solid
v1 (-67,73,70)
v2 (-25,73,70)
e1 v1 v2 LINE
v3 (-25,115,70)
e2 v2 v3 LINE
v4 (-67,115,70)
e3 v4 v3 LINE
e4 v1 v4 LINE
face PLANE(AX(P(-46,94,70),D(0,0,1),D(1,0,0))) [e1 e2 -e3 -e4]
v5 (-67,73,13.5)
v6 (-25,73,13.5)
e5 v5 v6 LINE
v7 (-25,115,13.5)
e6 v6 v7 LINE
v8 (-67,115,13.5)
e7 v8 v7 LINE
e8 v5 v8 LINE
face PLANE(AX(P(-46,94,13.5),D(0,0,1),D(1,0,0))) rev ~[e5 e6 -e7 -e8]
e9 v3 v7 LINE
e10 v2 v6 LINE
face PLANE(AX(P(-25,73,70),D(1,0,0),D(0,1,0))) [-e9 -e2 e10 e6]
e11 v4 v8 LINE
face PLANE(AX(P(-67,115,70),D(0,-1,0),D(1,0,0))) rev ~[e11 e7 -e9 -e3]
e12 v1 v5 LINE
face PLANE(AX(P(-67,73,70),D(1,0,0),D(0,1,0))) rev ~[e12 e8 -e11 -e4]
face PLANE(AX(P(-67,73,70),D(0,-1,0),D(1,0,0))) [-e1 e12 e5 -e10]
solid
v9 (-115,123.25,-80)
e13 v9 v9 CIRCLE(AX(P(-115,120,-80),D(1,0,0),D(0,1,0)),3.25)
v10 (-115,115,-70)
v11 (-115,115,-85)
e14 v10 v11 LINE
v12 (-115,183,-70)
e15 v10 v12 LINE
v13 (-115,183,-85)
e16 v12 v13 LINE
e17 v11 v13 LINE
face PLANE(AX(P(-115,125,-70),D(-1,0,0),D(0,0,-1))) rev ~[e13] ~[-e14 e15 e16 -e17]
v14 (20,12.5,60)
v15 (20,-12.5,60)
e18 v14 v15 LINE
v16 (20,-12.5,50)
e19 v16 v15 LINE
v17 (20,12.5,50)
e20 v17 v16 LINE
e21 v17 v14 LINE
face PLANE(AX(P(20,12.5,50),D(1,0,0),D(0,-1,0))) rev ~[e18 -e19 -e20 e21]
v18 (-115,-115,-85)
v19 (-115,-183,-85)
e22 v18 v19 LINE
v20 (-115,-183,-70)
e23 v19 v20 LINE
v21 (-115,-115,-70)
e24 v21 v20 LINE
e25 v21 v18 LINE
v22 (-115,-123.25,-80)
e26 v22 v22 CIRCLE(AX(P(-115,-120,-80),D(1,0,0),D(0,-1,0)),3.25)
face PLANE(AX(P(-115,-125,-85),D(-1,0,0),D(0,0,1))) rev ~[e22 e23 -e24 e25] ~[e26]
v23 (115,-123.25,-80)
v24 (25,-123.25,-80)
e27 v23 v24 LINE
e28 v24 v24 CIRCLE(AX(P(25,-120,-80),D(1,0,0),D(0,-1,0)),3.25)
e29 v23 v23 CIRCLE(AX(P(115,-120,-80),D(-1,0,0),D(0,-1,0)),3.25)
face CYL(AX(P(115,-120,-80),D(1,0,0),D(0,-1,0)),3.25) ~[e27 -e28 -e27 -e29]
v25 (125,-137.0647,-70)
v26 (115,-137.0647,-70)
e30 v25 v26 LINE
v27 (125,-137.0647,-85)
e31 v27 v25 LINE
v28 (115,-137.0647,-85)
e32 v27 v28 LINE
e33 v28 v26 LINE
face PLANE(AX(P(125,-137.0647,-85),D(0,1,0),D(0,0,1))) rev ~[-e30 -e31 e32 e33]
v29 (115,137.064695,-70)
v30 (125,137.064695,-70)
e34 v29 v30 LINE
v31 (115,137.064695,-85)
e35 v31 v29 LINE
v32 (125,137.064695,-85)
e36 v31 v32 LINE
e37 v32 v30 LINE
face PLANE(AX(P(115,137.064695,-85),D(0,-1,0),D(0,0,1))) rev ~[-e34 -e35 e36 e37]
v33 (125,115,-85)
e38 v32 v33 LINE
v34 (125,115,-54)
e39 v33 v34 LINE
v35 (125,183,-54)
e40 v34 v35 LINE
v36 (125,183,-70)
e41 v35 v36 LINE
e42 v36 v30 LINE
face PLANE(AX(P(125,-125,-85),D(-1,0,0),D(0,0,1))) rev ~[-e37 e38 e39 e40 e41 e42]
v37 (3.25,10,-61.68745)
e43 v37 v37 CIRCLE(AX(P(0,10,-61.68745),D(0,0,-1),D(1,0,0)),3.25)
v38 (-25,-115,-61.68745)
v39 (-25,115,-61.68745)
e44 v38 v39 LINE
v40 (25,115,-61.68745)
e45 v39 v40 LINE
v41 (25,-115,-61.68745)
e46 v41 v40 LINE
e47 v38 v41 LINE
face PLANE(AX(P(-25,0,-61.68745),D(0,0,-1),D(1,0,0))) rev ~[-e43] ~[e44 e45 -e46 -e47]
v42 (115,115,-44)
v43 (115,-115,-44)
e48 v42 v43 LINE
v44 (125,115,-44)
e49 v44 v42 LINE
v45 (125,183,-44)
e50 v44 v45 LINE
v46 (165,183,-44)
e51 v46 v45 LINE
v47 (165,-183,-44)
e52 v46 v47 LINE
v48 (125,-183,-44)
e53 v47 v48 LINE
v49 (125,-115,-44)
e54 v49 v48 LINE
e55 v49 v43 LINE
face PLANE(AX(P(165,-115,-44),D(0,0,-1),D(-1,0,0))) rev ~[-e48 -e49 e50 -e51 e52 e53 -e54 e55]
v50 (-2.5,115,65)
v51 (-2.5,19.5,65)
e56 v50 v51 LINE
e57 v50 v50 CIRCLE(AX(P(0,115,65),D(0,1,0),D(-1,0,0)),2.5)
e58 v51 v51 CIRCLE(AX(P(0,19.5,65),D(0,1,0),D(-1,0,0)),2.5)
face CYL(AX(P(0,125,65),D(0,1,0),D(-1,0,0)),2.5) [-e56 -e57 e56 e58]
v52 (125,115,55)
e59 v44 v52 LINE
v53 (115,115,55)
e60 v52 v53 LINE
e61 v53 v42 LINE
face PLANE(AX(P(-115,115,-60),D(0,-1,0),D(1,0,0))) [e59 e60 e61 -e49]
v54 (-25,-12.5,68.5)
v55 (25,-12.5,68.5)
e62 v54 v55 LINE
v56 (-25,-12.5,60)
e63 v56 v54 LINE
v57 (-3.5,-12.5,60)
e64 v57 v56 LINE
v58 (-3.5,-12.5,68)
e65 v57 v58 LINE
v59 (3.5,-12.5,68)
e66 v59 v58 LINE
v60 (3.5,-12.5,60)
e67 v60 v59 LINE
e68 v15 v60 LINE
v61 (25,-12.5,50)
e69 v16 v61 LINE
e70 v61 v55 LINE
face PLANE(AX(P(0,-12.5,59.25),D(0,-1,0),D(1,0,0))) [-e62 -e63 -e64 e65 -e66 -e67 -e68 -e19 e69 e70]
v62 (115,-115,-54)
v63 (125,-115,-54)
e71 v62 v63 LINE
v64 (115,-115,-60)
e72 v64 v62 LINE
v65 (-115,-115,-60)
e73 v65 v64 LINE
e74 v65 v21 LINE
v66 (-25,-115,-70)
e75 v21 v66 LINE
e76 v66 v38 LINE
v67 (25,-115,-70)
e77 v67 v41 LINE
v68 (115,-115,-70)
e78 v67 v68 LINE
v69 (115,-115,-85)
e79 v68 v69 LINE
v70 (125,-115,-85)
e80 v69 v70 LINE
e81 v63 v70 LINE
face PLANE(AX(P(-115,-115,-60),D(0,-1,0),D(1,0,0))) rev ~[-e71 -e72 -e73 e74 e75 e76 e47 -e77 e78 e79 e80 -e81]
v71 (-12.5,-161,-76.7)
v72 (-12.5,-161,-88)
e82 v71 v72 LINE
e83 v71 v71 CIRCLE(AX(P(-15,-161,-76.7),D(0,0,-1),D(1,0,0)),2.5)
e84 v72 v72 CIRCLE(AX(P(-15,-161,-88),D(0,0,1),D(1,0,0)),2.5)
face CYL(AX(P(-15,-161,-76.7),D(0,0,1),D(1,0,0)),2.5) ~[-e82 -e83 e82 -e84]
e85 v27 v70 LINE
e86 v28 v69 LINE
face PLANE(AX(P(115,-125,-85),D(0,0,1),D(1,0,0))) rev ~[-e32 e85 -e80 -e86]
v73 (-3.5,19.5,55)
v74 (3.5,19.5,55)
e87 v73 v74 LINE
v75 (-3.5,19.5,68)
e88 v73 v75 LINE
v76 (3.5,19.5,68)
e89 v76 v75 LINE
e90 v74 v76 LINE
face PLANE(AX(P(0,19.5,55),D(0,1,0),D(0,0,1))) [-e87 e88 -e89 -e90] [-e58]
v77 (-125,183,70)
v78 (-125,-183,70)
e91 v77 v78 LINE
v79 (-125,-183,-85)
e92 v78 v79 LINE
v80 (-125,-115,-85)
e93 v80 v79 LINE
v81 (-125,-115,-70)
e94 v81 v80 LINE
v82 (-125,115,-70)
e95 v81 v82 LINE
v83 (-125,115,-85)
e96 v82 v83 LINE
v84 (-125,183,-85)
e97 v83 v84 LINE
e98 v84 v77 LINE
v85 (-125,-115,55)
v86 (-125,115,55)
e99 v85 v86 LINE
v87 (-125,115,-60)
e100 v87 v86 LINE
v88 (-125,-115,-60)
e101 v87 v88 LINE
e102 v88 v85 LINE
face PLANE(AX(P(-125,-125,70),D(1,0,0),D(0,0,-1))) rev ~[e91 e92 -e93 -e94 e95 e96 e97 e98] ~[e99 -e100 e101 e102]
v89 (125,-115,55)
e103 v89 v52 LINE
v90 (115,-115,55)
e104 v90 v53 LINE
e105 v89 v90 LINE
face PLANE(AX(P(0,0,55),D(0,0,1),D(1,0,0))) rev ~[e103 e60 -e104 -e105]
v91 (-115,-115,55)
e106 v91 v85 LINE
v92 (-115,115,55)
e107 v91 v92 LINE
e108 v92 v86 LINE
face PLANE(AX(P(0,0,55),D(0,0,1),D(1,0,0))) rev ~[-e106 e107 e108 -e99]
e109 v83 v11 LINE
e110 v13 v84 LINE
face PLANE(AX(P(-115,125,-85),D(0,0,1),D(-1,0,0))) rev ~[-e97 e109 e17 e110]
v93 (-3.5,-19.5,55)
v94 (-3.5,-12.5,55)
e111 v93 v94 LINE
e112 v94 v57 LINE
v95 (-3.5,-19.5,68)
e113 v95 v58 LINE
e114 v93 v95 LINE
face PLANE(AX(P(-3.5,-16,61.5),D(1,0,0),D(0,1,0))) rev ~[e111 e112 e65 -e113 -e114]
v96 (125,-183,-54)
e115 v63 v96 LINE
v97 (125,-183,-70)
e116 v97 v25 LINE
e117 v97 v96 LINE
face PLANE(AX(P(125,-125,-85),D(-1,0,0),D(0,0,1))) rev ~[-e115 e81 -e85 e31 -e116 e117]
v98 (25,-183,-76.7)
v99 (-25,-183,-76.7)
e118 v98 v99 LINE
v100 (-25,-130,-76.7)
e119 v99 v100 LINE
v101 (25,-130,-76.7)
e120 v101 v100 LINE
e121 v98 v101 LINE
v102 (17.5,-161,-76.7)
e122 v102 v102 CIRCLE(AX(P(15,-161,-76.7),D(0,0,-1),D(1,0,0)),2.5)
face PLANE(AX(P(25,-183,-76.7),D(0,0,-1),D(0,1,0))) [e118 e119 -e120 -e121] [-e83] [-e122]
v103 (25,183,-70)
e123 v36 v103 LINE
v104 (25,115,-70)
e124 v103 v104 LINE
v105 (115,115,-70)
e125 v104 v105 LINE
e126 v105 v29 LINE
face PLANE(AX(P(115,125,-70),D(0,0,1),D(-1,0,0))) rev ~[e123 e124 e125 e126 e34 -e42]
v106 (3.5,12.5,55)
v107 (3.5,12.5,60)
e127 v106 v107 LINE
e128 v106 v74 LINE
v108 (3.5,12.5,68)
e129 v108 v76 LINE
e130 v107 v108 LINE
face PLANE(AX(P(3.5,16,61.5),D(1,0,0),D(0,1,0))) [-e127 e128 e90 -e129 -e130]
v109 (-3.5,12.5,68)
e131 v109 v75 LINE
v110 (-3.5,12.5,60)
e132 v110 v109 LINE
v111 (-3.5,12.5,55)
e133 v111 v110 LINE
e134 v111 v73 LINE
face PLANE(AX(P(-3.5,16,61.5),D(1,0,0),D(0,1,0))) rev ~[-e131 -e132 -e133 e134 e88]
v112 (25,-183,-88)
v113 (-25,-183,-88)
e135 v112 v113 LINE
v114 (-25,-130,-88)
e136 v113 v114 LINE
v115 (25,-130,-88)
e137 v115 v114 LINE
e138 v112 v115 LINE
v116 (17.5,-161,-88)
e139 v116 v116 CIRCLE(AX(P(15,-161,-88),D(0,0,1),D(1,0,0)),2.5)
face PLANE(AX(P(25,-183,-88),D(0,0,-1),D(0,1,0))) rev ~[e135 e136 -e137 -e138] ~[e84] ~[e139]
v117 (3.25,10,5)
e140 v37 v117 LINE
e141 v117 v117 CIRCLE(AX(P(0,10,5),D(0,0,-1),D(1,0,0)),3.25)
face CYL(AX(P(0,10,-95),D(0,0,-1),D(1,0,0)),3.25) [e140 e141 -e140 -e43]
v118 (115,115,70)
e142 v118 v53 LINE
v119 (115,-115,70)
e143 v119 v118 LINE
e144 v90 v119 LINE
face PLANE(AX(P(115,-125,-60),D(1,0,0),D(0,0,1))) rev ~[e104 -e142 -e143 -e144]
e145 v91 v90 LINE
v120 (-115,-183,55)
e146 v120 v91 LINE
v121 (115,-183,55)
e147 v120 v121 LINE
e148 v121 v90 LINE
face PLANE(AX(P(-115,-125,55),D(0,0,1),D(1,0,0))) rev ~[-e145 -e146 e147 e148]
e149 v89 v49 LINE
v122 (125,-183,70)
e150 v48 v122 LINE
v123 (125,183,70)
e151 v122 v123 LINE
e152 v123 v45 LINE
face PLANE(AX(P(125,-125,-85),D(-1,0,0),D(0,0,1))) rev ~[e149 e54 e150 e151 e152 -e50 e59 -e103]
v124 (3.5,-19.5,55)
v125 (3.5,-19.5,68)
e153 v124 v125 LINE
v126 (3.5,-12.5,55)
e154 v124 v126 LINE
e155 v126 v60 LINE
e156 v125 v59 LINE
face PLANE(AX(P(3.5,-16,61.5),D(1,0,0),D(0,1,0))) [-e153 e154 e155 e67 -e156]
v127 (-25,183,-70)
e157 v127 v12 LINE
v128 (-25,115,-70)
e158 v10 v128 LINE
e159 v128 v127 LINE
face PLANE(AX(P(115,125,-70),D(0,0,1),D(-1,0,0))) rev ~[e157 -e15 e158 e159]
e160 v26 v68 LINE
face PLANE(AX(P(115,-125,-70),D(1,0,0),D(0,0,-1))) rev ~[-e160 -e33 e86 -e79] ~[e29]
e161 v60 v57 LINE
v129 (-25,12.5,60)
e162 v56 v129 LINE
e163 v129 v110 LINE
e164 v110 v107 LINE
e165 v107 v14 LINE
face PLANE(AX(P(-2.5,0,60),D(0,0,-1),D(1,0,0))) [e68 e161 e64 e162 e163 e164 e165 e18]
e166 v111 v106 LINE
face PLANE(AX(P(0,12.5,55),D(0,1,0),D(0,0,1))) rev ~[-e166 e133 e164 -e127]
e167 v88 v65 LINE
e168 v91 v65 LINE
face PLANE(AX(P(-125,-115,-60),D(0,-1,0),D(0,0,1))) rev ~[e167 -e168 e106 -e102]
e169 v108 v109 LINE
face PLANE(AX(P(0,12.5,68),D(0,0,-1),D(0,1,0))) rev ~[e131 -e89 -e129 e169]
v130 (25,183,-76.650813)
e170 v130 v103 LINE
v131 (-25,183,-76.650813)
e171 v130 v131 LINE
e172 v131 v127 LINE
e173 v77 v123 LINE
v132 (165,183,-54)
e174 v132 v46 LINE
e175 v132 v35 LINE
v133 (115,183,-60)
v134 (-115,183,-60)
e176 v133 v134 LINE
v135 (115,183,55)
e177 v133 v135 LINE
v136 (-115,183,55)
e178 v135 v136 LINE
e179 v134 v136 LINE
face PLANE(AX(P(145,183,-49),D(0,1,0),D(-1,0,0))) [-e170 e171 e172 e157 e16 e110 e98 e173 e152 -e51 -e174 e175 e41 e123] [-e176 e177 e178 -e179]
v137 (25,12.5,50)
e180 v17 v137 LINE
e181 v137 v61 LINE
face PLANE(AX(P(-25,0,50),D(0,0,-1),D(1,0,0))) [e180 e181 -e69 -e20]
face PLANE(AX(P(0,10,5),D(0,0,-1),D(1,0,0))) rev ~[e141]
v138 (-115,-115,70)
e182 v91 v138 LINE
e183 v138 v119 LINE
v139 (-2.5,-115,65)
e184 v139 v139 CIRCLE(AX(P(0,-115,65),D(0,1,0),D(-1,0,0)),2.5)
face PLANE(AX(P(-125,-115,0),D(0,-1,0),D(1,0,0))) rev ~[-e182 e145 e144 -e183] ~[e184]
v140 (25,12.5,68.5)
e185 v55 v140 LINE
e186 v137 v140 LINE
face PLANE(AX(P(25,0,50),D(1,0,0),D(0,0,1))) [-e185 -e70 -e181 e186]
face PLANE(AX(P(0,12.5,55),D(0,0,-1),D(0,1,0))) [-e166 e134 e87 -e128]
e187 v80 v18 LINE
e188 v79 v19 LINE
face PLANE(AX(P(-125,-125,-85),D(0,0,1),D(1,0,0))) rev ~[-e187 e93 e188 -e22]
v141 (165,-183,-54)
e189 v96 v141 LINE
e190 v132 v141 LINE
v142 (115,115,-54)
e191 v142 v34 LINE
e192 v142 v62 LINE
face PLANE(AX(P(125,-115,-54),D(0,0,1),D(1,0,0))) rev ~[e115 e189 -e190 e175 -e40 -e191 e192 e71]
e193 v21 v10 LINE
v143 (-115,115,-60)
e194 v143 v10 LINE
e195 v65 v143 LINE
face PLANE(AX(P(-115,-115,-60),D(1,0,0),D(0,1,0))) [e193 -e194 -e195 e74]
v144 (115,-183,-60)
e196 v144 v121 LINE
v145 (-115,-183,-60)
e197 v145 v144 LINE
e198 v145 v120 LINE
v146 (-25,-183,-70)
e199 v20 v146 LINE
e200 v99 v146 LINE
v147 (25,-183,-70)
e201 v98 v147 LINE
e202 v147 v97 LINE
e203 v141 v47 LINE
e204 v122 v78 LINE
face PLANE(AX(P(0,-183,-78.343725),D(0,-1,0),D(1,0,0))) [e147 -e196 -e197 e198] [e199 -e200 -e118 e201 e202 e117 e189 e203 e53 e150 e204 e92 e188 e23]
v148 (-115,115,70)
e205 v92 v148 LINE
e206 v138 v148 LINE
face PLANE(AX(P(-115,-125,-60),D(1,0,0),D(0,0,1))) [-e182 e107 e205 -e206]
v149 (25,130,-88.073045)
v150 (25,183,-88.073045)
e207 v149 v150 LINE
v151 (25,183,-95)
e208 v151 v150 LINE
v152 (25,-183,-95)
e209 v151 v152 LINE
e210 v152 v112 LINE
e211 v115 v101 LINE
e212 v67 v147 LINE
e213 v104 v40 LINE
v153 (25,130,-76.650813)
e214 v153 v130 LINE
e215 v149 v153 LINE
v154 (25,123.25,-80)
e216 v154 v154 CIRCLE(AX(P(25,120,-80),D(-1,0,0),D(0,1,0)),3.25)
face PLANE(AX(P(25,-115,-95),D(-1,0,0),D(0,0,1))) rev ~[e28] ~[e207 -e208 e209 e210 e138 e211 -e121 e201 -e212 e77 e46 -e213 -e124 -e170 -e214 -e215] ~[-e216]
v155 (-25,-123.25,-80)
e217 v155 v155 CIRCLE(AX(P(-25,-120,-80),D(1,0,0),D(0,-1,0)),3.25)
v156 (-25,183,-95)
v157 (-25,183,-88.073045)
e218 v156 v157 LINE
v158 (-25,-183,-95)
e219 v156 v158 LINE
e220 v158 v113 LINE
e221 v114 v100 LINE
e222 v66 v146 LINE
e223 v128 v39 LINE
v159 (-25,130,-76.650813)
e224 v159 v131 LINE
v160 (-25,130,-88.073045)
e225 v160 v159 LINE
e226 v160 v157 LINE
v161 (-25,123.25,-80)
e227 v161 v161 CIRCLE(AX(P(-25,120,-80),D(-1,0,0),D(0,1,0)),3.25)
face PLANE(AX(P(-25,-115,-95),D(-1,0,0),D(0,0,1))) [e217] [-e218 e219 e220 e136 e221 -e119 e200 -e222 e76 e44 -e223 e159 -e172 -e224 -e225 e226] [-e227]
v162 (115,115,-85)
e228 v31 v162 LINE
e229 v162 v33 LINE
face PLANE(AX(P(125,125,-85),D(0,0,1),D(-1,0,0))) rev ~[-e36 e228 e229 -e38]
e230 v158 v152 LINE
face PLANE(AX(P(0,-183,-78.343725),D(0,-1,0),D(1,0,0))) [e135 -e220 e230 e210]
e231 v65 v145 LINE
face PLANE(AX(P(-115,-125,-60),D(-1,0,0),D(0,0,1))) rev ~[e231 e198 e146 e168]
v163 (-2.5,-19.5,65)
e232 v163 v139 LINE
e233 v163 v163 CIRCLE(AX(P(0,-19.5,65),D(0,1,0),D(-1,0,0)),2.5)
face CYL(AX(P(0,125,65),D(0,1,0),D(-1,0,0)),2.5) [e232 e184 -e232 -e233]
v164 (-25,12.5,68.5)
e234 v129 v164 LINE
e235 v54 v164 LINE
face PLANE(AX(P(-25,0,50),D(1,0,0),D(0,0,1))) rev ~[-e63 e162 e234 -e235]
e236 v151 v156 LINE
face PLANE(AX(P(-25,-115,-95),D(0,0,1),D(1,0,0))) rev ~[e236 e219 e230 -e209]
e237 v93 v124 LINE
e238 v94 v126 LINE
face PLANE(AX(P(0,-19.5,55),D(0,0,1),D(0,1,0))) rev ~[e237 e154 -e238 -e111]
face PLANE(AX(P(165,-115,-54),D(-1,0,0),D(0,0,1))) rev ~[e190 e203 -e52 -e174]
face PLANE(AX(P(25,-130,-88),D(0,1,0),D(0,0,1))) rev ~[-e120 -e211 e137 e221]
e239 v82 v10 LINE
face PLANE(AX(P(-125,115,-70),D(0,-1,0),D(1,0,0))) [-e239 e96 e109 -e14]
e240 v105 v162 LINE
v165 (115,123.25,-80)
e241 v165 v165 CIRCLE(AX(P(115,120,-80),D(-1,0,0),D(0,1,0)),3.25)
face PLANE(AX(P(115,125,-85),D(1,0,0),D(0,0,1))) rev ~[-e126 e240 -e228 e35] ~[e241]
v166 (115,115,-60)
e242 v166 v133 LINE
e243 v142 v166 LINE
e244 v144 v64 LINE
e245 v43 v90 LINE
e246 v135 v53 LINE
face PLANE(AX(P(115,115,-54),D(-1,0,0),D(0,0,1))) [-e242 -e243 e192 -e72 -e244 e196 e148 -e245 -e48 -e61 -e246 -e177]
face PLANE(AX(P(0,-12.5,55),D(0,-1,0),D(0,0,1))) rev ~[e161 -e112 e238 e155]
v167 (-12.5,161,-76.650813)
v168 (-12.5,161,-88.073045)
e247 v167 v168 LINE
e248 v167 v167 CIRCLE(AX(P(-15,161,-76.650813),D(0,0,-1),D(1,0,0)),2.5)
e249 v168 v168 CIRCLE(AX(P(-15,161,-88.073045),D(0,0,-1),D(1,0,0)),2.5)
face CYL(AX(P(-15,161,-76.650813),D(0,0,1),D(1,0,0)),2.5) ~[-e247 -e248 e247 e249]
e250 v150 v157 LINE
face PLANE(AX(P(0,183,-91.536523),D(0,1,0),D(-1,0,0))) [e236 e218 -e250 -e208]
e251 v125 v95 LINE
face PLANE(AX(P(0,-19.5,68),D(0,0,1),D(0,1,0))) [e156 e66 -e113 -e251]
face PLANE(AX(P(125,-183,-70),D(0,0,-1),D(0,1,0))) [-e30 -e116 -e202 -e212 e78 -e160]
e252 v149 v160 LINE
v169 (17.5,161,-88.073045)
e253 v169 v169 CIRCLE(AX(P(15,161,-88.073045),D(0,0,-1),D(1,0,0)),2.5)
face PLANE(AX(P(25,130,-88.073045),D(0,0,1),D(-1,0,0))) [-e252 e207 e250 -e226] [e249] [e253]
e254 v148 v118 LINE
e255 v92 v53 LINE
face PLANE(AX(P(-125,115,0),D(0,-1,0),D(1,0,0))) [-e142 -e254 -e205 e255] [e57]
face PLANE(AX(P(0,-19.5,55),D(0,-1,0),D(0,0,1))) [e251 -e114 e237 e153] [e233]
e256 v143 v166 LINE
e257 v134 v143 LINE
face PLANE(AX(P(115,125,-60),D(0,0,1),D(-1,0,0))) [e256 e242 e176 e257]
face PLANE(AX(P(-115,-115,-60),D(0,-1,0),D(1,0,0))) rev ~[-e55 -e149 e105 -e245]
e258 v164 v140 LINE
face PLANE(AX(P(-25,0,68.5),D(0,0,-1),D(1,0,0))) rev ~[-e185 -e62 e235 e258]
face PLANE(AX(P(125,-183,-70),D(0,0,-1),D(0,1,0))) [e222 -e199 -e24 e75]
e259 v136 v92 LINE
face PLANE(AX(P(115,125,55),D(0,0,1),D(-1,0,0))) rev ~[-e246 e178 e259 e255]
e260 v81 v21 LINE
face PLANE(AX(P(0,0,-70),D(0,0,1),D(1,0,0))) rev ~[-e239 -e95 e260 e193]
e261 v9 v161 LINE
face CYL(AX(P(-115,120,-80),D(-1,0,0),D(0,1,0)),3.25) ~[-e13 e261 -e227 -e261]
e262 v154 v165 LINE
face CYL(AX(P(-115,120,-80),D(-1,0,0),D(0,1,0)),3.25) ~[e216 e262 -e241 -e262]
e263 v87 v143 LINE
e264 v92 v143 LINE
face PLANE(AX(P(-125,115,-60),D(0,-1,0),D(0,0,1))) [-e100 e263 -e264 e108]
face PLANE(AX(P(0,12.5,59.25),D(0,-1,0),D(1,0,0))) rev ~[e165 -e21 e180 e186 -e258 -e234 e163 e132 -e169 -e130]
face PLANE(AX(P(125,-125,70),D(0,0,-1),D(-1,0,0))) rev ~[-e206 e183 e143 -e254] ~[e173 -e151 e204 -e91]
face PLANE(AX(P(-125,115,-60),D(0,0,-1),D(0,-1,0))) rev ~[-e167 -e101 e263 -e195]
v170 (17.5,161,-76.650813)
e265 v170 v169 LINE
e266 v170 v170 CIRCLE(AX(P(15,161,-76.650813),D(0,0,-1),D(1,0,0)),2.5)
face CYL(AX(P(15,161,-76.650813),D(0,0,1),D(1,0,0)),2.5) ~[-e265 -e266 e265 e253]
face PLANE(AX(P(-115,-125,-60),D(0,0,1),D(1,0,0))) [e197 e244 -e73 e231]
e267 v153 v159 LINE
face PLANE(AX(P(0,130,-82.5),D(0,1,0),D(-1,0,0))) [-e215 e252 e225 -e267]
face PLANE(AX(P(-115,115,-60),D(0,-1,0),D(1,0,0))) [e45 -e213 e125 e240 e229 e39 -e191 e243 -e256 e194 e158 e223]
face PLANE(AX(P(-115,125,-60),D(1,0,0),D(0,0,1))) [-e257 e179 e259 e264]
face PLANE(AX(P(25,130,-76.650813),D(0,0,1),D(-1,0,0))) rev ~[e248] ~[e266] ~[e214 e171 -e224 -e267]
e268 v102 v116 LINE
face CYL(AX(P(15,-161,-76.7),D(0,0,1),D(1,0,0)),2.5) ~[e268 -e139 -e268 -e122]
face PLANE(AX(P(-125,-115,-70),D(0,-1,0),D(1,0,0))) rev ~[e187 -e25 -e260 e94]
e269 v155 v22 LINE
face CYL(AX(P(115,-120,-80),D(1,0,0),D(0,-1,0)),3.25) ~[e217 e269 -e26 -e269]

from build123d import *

# Parameters (mm, degrees)
F0_W         = 250
F0_H         = 250
F1_DEPTH     = 70
F2_T         = -10
F3_W         = 230
F3_H         = 120
F4_DEPTH     = 300
F5_W         = 230
F5_H         = 120
F6_DEPTH     = 300
F7_W         = 230
F7_H         = 230
F8_DEPTH     = 500
F9_W         = 10
F9_H         = 10
F1_FACE3_W   = 250
F1_FACE3_H   = 250
F1_FACE3_W_2 = 230
F1_FACE3_H_2 = 230
F10_DEPTH    = 15
F11_R        = 2.5
F12_DEPTH    = 250
F13_W        = 50
F13_H        = 18.5
F14_DEPTH    = 12.5
F16_DEPTH    = 10
F17_W        = 7
F17_H        = 13
F18_DEPTH    = 3.5
F19_R        = 3.25
F20_DEPTH    = 240
F21_W        = 50
F21_H        = 33.3125502616
F22_DEPTH    = 115
F23_R        = 3.25
F24_DEPTH    = 240
F25_R        = 3.25
F26_DEPTH    = 100
F27_W        = 42
F27_H        = 42
F28_DEPTH    = 56.5
F29_W        = 230
F29_H        = 115
F30_DEPTH    = 58
F31_W        = 230
F31_H        = 115
F32_DEPTH    = 58
F33_W        = 50
F33_H        = 25
F34_DEPTH    = 15
F35_W        = 50
F35_H        = 6.9269549847
F35_H_2      = 6.6508132219
F36_DEPTH    = 53
F37_R        = 2.5
F38_DEPTH    = 11.4222317934
F39_W        = 10
F39_H        = 230
F40_DEPTH    = 25
F41_W        = 40
F41_H        = 10
F41_W_2      = 10
F42_DEPTH    = 230
F43_W        = 40
F43_H        = 10
F44_DEPTH    = 68
F45_W        = 45.9353046417
F45_H        = 15
F46_DEPTH    = 25
F47_DEPTH    = 68
F48_W        = 45.9353
F48_H        = 15
F49_DEPTH    = 25
F50_DEPTH    = 68
F51_W        = 53
F51_H        = 11.3
F52_DEPTH    = 50
F53_R        = 2.5
F54_DEPTH    = 18.3


with BuildPart() as f1:
    # F0 (on Top) → F1 (new body, symmetric)
    with BuildSketch(Plane.XY):
        Rectangle(F0_W, F0_H)
    extrude(amount=F1_DEPTH, both=True)

    # F2
    f2_openings = [f1.faces().sort_by_distance(p)[0] for p in [
        (0, 0, 70),
    ]]
    offset(amount=F2_T, openings=f2_openings)

    # F3 (on face) → F4 (cut)
    with BuildSketch(Plane.XZ.offset(125)):
        Rectangle(F3_W, F3_H)
    extrude(amount=-F4_DEPTH, mode=Mode.SUBTRACT)

    # F5 (on face) → F6 (cut)
    with BuildSketch(Plane(origin=(-125, 0, 0), x_dir=(0, -1, 0), z_dir=(-1, 0, 0))):
        Rectangle(F5_W, F5_H)
    extrude(amount=-F6_DEPTH, mode=Mode.SUBTRACT)

    # F7 (on face) → F8 (cut)
    with BuildSketch(Plane.XY.offset(-60)):
        Rectangle(F7_W, F7_H)
    extrude(amount=-F8_DEPTH, mode=Mode.SUBTRACT)

    # F9 (on face) + F1_face3 (on face) → F10 (join)
    with BuildSketch(Plane(origin=(0, 0, -70), x_dir=(1, 0, 0), z_dir=(0, 0, -1))):
        with Locations((-120, -120)):
            Rectangle(F9_W, F9_H)
        with Locations((-120, 120)):
            Rectangle(F9_W, F9_H)
        with Locations((120, -120)):
            Rectangle(F9_W, F9_H)
        with Locations((120, 120)):
            Rectangle(F9_W, F9_H)
    with BuildSketch(Plane.XY.offset(70)):
        Rectangle(F1_FACE3_W, F1_FACE3_H)
        Rectangle(F1_FACE3_W_2, F1_FACE3_H_2, mode=Mode.SUBTRACT)
    extrude(amount=F10_DEPTH, dir=(0, 0, -1))

    # F11 (on face) → F12 (join)
    with BuildSketch(Plane(origin=(0, 125, 0), x_dir=(-1, 0, 0), z_dir=(0, 1, 0))):
        with Locations((0, 65)):
            Circle(F11_R)
    extrude(amount=-F12_DEPTH)

    # F13 (on Front) → F14 (join, symmetric)
    with BuildSketch(Plane.XZ):
        with Locations((0, 59.25)):
            Rectangle(F13_W, F13_H)
    extrude(amount=F14_DEPTH, both=True)

    # F15 (on face) → F16 (cut)
    with BuildSketch(Plane(origin=(0, 0, 50), x_dir=(1, 0, 0), z_dir=(0, 0, -1))):
        Polygon((20, -12.5), (20, 7.5), (20, 12.5), (-25, 12.5), (-25, -12.5), align=None)
    extrude(amount=-F16_DEPTH, mode=Mode.SUBTRACT)

    # F17 (on Right) → F18 (join, symmetric)
    with BuildSketch(Plane.YZ):
        with Locations((-16, 61.5)):
            Rectangle(F17_W, F17_H)
        with Locations((16, 61.5)):
            Rectangle(F17_W, F17_H)
    extrude(amount=F18_DEPTH, both=True)

    # F19 (on face) → F20 (join)
    with BuildSketch(Plane.YZ.offset(-115)):
        with Locations((120, -80)):
            Circle(F19_R)
    extrude(amount=F20_DEPTH)

    # F21 (on Front) → F22 (join, symmetric)
    with BuildSketch(Plane.XZ):
        with Locations((0, -78.3437248692)):
            Rectangle(F21_W, F21_H)
    extrude(amount=F22_DEPTH, both=True)

    # F23 (on face) → F24 (join)
    with BuildSketch(Plane(origin=(115, 0, 0), x_dir=(0, -1, 0), z_dir=(-1, 0, 0))):
        with Locations((120, -80)):
            Circle(F23_R)
    extrude(amount=F24_DEPTH)

    # F25 (on face) → F26 (join)
    with BuildSketch(Plane(origin=(0, 0, -95), x_dir=(1, 0, 0), z_dir=(0, 0, -1))):
        with Locations((0, -10)):
            Circle(F25_R)
    extrude(amount=-F26_DEPTH)

    # F29 (on face) → F30 (join)
    with BuildSketch(Plane(origin=(0, 125, 0), x_dir=(-1, 0, 0), z_dir=(0, 1, 0))):
        Polygon((-115, -85), (-115, -70), (115, -70), (115, -85), (125, -85), (125, 70), (-125, 70), (-125, -85), align=None)
        with Locations((0, -2.5)):
            Rectangle(F29_W, F29_H, mode=Mode.SUBTRACT)
    extrude(amount=F30_DEPTH)

    # F31 (on face) → F32 (join)
    with BuildSketch(Plane.XZ.offset(125)):
        Polygon((125, 70), (-125, 70), (-125, -85), (-115, -85), (-115, -70), (115, -70), (115, -85), (125, -85), align=None)
        with Locations((0, -2.5)):
            Rectangle(F31_W, F31_H, mode=Mode.SUBTRACT)
    extrude(amount=F32_DEPTH)

    # F33 (on face) → F34 (join)
    with BuildSketch(Plane(origin=(0, 115, 0), x_dir=(-1, 0, 0), z_dir=(0, 1, 0))):
        with Locations((0, -82.5)):
            Rectangle(F33_W, F33_H)
    extrude(amount=F34_DEPTH)

    # F35 (on face) → F36 (join, through all)
    with BuildSketch(Plane(origin=(0, 130, 0), x_dir=(-1, 0, 0), z_dir=(0, 1, 0))):
        with Locations((0, -91.5365225077)):
            Rectangle(F35_W, F35_H)
        with Locations((0, -73.325406611)):
            Rectangle(F35_W, F35_H_2)
    extrude(amount=F36_DEPTH)

    # F37 (on face) → F38 (join, through all)
    with BuildSketch(Plane(origin=(0, 0, -76.6508132219), x_dir=(1, 0, 0), z_dir=(0, 0, -1))):
        with Locations((-15, -161)):
            Circle(F37_R)
        with Locations((15, -161)):
            Circle(F37_R)
    extrude(amount=F38_DEPTH)

    # F39 (on face) → F40 (cut)
    with BuildSketch(Plane(origin=(0, 0, -70), x_dir=(1, 0, 0), z_dir=(0, 0, -1))):
        with Locations((120, 0)):
            Rectangle(F39_W, F39_H)
    extrude(amount=-F40_DEPTH, mode=Mode.SUBTRACT)

    # F41 (on face) → F42 (join, through all)
    with BuildSketch(Plane.XZ.offset(-115)):
        with Locations((145, -49)):
            Rectangle(F41_W, F41_H)
        with Locations((120, -49)):
            Rectangle(F41_W_2, F41_H)
    extrude(amount=F42_DEPTH)

    # F43 (on face) → F44 (join, through all)
    with BuildSketch(Plane(origin=(0, 115, 0), x_dir=(-1, 0, 0), z_dir=(0, 1, 0))):
        with Locations((-145, -49)):
            Rectangle(F43_W, F43_H)
    extrude(amount=F44_DEPTH)

    # F45 (on face) → F46 (cut)
    with BuildSketch(Plane(origin=(115, 0, 0), x_dir=(0, -1, 0), z_dir=(-1, 0, 0))):
        with Locations((-160.0323476791, -77.5)):
            Rectangle(F45_W, F45_H)
    extrude(amount=-F46_DEPTH, mode=Mode.SUBTRACT)

    # F47 (add, through all): a face of the model
    f47_faces = [f1.faces().sort_by_distance(p)[0] for p in [
        (145, -115, -49),
    ]]
    extrude(f47_faces, amount=F47_DEPTH)

    # F48 (on face) → F49 (cut)
    with BuildSketch(Plane.YZ.offset(125)):
        with Locations((-160.03235, -77.5)):
            Rectangle(F48_W, F48_H)
    extrude(amount=-F49_DEPTH, mode=Mode.SUBTRACT)

    # F50 (add, through all): a face of the model
    f50_faces = [f1.faces().sort_by_distance(p)[0] for p in [
        (0, -115, -82.5),
    ]]
    extrude(f50_faces, amount=F50_DEPTH)

    # F51 (on face) → F52 (cut)
    with BuildSketch(Plane.YZ.offset(25)):
        with Locations((-156.5, -82.35)):
            Rectangle(F51_W, F51_H)
    extrude(amount=-F52_DEPTH, mode=Mode.SUBTRACT)

    # F53 (on face) → F54 (join, through all)
    with BuildSketch(Plane(origin=(0, 0, -76.7), x_dir=(1, 0, 0), z_dir=(0, 0, -1))):
        with Locations((15, 161)):
            Circle(F53_R)
        with Locations((-15, 161)):
            Circle(F53_R)
    extrude(amount=F54_DEPTH)


with BuildPart() as f28:
    # F27 (on face) → F28 (new body)
    with BuildSketch(Plane.XY.offset(70)):
        with Locations((-46, 94)):
            Rectangle(F27_W, F27_H)
    extrude(amount=-F28_DEPTH)


solid = Compound([f1.part, f28.part])
